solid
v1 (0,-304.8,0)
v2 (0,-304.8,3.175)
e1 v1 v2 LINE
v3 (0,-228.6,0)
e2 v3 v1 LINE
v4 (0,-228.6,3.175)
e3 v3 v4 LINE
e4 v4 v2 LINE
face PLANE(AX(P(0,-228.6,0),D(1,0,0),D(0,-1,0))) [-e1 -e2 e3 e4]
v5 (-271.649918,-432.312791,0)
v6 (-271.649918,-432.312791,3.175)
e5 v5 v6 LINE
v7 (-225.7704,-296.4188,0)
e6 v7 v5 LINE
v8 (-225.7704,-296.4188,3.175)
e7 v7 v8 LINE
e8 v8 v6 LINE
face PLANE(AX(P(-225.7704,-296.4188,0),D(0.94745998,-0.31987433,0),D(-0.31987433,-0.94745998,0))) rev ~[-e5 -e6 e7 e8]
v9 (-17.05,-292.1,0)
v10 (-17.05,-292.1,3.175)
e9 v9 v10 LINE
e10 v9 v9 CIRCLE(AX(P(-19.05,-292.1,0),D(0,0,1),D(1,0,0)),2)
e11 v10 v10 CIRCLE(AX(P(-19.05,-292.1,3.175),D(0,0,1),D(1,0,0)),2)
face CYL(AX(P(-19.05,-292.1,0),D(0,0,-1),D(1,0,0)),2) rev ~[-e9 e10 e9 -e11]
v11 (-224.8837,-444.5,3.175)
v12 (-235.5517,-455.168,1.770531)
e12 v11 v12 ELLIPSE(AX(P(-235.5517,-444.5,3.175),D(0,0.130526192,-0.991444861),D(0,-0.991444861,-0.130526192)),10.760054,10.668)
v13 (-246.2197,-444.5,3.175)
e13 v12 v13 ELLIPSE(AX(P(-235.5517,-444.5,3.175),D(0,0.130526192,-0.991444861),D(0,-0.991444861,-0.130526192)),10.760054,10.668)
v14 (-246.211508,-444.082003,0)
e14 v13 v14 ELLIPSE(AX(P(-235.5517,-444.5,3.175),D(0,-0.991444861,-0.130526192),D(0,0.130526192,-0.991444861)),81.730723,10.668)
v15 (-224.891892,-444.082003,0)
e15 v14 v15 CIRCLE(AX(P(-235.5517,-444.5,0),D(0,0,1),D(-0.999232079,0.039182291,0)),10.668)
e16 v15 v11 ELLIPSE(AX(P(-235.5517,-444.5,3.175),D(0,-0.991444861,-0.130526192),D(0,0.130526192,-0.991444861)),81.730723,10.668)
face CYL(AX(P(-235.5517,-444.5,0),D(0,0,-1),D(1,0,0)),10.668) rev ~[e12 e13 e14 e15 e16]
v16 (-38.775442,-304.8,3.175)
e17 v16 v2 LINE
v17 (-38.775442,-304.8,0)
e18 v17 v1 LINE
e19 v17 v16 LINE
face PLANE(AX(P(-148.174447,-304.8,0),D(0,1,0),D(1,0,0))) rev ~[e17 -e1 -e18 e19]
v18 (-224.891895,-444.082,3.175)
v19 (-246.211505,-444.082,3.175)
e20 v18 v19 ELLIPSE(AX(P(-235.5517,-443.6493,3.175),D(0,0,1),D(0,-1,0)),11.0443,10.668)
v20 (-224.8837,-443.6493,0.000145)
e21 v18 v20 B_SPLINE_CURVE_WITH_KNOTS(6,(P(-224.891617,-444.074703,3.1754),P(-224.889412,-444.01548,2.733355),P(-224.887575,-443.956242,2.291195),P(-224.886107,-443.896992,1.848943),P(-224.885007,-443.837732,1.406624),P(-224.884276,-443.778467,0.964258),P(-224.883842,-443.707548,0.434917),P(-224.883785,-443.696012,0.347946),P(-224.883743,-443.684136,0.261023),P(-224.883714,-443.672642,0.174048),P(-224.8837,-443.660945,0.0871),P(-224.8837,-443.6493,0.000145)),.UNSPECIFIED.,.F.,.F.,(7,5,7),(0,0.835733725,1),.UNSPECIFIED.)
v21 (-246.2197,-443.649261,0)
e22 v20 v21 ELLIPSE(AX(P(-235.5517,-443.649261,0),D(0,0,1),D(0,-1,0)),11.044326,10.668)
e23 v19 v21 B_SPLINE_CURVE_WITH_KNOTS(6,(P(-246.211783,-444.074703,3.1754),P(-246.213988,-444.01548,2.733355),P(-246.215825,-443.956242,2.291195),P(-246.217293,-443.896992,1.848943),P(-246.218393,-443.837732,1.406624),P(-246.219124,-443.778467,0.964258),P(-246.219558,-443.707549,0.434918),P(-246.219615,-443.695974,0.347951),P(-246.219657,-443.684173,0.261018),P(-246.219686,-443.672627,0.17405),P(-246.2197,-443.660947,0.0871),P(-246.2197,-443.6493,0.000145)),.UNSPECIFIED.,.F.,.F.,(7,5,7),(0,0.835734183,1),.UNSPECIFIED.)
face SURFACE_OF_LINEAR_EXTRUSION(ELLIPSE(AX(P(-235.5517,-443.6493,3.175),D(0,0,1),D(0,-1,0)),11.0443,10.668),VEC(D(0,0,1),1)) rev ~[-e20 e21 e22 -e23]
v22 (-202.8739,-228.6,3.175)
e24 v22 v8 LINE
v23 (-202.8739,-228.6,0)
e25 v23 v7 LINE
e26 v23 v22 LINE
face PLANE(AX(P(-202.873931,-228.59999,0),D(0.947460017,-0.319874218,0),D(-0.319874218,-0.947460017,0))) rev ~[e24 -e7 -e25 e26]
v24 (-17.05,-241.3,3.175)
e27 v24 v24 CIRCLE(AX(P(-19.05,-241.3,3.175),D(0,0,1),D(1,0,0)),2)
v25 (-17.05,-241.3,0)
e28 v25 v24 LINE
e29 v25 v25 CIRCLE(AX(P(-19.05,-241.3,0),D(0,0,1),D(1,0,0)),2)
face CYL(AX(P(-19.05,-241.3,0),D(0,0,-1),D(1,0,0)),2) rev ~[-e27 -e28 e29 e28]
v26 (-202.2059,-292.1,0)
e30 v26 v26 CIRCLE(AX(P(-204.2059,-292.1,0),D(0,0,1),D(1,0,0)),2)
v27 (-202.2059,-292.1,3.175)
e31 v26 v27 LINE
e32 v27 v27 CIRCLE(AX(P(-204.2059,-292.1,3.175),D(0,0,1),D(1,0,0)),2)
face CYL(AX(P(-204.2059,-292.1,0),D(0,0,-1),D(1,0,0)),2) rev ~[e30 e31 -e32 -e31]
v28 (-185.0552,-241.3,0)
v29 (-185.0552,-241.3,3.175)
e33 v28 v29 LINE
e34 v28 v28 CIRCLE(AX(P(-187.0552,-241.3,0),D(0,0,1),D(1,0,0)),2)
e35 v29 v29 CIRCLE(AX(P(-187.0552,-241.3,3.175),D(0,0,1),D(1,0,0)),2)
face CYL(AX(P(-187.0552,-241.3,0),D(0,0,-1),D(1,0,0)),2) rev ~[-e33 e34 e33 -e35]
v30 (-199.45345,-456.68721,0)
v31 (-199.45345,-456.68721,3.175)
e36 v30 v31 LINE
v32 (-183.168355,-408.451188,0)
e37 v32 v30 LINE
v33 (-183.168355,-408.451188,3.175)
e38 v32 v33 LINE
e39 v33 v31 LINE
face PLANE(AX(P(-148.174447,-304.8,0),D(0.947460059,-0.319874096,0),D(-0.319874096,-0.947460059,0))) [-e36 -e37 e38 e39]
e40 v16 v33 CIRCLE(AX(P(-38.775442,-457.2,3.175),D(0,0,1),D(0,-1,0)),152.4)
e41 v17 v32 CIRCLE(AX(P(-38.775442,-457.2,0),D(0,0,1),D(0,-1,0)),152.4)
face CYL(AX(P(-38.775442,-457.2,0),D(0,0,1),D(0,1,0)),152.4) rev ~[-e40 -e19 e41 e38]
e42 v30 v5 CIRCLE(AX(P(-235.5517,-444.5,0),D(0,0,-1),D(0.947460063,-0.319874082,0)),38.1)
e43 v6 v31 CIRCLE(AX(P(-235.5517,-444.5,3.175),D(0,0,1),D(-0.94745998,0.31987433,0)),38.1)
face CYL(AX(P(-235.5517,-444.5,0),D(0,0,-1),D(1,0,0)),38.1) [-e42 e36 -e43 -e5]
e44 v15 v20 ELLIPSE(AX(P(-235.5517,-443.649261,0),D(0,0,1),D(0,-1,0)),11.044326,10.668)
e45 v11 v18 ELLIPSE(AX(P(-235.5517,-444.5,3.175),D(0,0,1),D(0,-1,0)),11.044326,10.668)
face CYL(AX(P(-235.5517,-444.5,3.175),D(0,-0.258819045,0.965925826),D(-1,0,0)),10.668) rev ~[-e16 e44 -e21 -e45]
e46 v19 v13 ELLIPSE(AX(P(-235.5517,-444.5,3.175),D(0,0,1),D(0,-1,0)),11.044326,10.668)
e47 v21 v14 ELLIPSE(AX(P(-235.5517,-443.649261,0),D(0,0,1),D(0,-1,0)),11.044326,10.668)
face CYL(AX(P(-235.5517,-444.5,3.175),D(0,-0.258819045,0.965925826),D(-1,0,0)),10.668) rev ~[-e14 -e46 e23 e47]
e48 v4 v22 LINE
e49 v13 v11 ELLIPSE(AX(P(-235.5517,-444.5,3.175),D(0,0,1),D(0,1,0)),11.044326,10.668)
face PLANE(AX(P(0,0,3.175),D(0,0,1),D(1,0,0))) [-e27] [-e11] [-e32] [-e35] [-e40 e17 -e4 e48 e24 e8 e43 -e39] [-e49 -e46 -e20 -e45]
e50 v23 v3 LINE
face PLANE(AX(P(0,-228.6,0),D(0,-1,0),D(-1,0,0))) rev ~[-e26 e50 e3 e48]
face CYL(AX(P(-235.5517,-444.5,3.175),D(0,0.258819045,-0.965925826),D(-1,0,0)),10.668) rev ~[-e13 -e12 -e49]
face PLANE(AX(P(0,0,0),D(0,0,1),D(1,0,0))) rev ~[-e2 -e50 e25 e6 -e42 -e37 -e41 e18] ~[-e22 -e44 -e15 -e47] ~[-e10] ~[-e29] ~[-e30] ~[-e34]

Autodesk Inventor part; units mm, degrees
ref_plane "YZ Plane" through (0, 0, 0) normal (1, 0, 0) x (0, 1, 0)
ref_plane "XZ Plane" through (0, 0, 0) normal (0, 1, 0) x (-1, 0, 0)
ref_plane "XY Plane" through (0, 0, 0) normal (0, 0, 1) x (1, 0, 0)
sketch "Sketch1" plane through (0, 0, 0) normal (0, 0, 1) x (1, 0, 0)
  arc A0 (219.754, -304.8) -> (225.7704, -296.4188) centre (219.754, -298.45) ccw projected
  line L0 (225.7704, -296.4188) -> (30.0819, 283.206) projected
  arc A1 (30.0819, 283.206) -> (-30.0819, 283.206) centre (0, 273.05) ccw projected
  line L1 (-30.0819, 283.206) -> (-225.7704, -296.4188) projected
  arc A2 (-225.7704, -296.4188) -> (-219.754, -304.8) centre (-219.754, -298.45) ccw projected
  line L2 (-219.754, -304.8) -> (219.754, -304.8) projected
  line L3 (-38.1, -17.4222) -> (-38.1, -222.25) projected
  arc A3 (-44.45, -228.6) -> (-38.1, -222.25) centre (-44.45, -222.25) ccw projected
  line L4 (-44.45, -228.6) -> (-113.6024, -228.6) projected
  arc A4 (-119.6188, -220.2188) -> (-113.6024, -228.6) centre (-113.6024, -222.25) ccw projected
  line L5 (-119.6188, -220.2188) -> (-50.4664, -15.391) projected
  arc A5 (-38.1, -17.4222) -> (-50.4664, -15.391) centre (-44.45, -17.4222) ccw projected
  line L6 (113.6024, -228.6) -> (44.45, -228.6) projected
  arc A6 (38.1, -222.25) -> (44.45, -228.6) centre (44.45, -222.25) ccw projected
  line L7 (38.1, -222.25) -> (38.1, -17.4222) projected
  arc A7 (50.4664, -15.391) -> (38.1, -17.4222) centre (44.45, -17.4222) ccw projected
  line L8 (50.4664, -15.391) -> (119.6188, -220.2188) projected
  arc A8 (113.6024, -228.6) -> (119.6188, -220.2188) centre (113.6024, -222.25) ccw projected
  circle A9 centre (-204.2059, -292.1) radius 2 projected
  circle A10 centre (-187.0552, -241.3) radius 2 projected
  circle A11 centre (187.0552, -241.3) radius 2 projected
  circle A12 centre (204.2059, -292.1) radius 2 projected
  circle A13 centre (19.05, -241.3) radius 2 projected
  circle A14 centre (19.05, -292.1) radius 2 projected
  circle A15 centre (-19.05, -292.1) radius 2 projected
  circle A16 centre (-19.05, -241.3) radius 2 projected
  circle A17 centre (8.89, 288.4479) radius 2 projected
  circle A18 centre (-8.89, 288.4479) radius 2 projected
  circle A19 centre (-17.78, 273.05) radius 2 projected
  circle A20 centre (-8.89, 257.6521) radius 2 projected
  circle A21 centre (8.89, 257.6521) radius 2 projected
  circle A22 centre (17.78, 273.05) radius 2 projected
  line L9 (0, -228.6) -> (-202.8739, -228.6)
  line L10 (0, -228.6) -> (0, -304.8)
  line L11 (-119.6188, -220.2188) -> (-208.2019, -482.6)
  line L12 (-225.7704, -296.4188) -> (-288.6275, -482.6)
  line L13 (-288.6275, -482.6) -> (-208.2019, -482.6)
  circle A23 centre (-235.5517, -444.5) radius 38.1
  circle A24 centre (-235.5517, -444.5) radius 10.668
  ellipse E0 centre (0, 273.05) end of major axis (-12.7, 273.05) minor radius 12.2673 projected
  point P0 (0, 0)
  point P1 (-271.6499, -432.3128)
  point P2 (-199.4535, -456.6872)
  point P3 (-148.1744, -304.8)
  dimension "d0" = 21.336
  dimension "d1" = 254
extrude "Extrusion1" add sketch "Sketch1" along normal blind 3.175 contours L2 L11 L9 L4 L10 | L11 A23 L12 A2 L2 | L2 A2 L1 L9 L11 | A23
fillet "Fillet1" radius 152.4 1 edges at (-148.1744, -304.8, 1.5875)
ref_plane "Work Plane1" through (-235.5517, -444.5, 3.175) normal (0, -0.258819, 0.9659258) x (-1, 0, 0)
sketch "Sketch2" plane through (-235.5517, -444.5, 3.175) normal (0, -0.258819, 0.9659258) x (-1, 0, 0)
  ellipse E0 centre (0, 0) end of major axis (10.668, 0) minor radius 10.3045 projected
  circle A0 centre (0, 0) radius 10.668
  point P0 (-235.5517, -428.5323)
  dimension "d6" = 21.336
sketch "Sketch3" plane through (0, 0, 3.175) normal (0, 0, 1) x (1, 0, 0)
  point P0 (0, 0)
extrude "Extrusion2" cut sketch "Sketch2" along normal through all both and the other way through all
sketch "Sketch4" plane through (0, 0, 3.175) normal (0, 0, 1) x (1, 0, 0)
  ellipse E0 centre (-235.5517, -444.5) end of major axis (-235.5517, -455.5443) minor radius 10.668 (-224.8837, -444.5) -> (-246.2197, -444.5) ccw projected
  ellipse E1 centre (-235.5517, -444.5) end of major axis (-235.5517, -455.5443) minor radius 10.668 (-246.2197, -444.5) -> (-224.8837, -444.5) ccw projected
  line L0 (-202.8739, -228.6) -> (-271.6499, -432.3128) projected
  arc A0 (-271.6499, -432.3128) -> (-199.4535, -456.6872) centre (-235.5517, -444.5) ccw projected
  arc A1 (-38.7755, -304.8) -> (-183.1684, -408.4512) centre (-38.7755, -457.2) ccw projected
  line L1 (-38.7755, -304.8) -> (0, -304.8) projected
  line L2 (0, -304.8) -> (0, -228.6) projected
  line L3 (0, -228.6) -> (-202.8739, -228.6) projected
  circle A2 centre (-19.05, -241.3) radius 2 projected
  circle A3 centre (-19.05, -292.1) radius 2 projected
  circle A4 centre (-204.2059, -292.1) radius 2 projected
  circle A5 centre (-187.0552, -241.3) radius 2 projected
  circle A6 centre (-187.0552, -241.3) radius 2 projected
  circle A7 centre (-204.2059, -292.1) radius 2 projected
  ellipse E2 centre (-235.5517, -443.6493) end of major axis (-235.5517, -454.6936) minor radius 10.668 (-224.8919, -444.082) -> (-246.2115, -444.082) ccw projected
  arc A8 (-246.2115, -444.082) -> (-224.8919, -444.082) centre (-235.5517, -444.5) ccw projected
  circle A9 centre (-19.05, -292.1) radius 2 projected
  circle A10 centre (-19.05, -241.3) radius 2 projected
  line L4 (-202.8739, -228.6) -> (-271.6499, -432.3128) projected
  line L5 (0, -228.6) -> (-202.8739, -228.6) projected
  line L6 (0, -304.8) -> (0, -228.6) projected
  line L7 (-38.7755, -304.8) -> (0, -304.8) projected
  arc A11 (-38.7755, -304.8) -> (-183.1684, -408.4512) centre (-38.7755, -457.2) ccw projected
  arc A12 (-271.6499, -432.3128) -> (-199.4535, -456.6872) centre (-235.5517, -444.5) ccw projected
  line L8 (-199.4535, -456.6872) -> (-183.1684, -408.4512) projected
  line L9 (-199.4535, -456.6872) -> (-183.1684, -408.4512) projected
  point P0 (0, 0)
extrude "Extrusion3" cut sketch "Sketch4" against normal through all contours A8 E0 | E0 E2
properties part number "FrameLeg" material "MDF Medium Density Fiberboard"
